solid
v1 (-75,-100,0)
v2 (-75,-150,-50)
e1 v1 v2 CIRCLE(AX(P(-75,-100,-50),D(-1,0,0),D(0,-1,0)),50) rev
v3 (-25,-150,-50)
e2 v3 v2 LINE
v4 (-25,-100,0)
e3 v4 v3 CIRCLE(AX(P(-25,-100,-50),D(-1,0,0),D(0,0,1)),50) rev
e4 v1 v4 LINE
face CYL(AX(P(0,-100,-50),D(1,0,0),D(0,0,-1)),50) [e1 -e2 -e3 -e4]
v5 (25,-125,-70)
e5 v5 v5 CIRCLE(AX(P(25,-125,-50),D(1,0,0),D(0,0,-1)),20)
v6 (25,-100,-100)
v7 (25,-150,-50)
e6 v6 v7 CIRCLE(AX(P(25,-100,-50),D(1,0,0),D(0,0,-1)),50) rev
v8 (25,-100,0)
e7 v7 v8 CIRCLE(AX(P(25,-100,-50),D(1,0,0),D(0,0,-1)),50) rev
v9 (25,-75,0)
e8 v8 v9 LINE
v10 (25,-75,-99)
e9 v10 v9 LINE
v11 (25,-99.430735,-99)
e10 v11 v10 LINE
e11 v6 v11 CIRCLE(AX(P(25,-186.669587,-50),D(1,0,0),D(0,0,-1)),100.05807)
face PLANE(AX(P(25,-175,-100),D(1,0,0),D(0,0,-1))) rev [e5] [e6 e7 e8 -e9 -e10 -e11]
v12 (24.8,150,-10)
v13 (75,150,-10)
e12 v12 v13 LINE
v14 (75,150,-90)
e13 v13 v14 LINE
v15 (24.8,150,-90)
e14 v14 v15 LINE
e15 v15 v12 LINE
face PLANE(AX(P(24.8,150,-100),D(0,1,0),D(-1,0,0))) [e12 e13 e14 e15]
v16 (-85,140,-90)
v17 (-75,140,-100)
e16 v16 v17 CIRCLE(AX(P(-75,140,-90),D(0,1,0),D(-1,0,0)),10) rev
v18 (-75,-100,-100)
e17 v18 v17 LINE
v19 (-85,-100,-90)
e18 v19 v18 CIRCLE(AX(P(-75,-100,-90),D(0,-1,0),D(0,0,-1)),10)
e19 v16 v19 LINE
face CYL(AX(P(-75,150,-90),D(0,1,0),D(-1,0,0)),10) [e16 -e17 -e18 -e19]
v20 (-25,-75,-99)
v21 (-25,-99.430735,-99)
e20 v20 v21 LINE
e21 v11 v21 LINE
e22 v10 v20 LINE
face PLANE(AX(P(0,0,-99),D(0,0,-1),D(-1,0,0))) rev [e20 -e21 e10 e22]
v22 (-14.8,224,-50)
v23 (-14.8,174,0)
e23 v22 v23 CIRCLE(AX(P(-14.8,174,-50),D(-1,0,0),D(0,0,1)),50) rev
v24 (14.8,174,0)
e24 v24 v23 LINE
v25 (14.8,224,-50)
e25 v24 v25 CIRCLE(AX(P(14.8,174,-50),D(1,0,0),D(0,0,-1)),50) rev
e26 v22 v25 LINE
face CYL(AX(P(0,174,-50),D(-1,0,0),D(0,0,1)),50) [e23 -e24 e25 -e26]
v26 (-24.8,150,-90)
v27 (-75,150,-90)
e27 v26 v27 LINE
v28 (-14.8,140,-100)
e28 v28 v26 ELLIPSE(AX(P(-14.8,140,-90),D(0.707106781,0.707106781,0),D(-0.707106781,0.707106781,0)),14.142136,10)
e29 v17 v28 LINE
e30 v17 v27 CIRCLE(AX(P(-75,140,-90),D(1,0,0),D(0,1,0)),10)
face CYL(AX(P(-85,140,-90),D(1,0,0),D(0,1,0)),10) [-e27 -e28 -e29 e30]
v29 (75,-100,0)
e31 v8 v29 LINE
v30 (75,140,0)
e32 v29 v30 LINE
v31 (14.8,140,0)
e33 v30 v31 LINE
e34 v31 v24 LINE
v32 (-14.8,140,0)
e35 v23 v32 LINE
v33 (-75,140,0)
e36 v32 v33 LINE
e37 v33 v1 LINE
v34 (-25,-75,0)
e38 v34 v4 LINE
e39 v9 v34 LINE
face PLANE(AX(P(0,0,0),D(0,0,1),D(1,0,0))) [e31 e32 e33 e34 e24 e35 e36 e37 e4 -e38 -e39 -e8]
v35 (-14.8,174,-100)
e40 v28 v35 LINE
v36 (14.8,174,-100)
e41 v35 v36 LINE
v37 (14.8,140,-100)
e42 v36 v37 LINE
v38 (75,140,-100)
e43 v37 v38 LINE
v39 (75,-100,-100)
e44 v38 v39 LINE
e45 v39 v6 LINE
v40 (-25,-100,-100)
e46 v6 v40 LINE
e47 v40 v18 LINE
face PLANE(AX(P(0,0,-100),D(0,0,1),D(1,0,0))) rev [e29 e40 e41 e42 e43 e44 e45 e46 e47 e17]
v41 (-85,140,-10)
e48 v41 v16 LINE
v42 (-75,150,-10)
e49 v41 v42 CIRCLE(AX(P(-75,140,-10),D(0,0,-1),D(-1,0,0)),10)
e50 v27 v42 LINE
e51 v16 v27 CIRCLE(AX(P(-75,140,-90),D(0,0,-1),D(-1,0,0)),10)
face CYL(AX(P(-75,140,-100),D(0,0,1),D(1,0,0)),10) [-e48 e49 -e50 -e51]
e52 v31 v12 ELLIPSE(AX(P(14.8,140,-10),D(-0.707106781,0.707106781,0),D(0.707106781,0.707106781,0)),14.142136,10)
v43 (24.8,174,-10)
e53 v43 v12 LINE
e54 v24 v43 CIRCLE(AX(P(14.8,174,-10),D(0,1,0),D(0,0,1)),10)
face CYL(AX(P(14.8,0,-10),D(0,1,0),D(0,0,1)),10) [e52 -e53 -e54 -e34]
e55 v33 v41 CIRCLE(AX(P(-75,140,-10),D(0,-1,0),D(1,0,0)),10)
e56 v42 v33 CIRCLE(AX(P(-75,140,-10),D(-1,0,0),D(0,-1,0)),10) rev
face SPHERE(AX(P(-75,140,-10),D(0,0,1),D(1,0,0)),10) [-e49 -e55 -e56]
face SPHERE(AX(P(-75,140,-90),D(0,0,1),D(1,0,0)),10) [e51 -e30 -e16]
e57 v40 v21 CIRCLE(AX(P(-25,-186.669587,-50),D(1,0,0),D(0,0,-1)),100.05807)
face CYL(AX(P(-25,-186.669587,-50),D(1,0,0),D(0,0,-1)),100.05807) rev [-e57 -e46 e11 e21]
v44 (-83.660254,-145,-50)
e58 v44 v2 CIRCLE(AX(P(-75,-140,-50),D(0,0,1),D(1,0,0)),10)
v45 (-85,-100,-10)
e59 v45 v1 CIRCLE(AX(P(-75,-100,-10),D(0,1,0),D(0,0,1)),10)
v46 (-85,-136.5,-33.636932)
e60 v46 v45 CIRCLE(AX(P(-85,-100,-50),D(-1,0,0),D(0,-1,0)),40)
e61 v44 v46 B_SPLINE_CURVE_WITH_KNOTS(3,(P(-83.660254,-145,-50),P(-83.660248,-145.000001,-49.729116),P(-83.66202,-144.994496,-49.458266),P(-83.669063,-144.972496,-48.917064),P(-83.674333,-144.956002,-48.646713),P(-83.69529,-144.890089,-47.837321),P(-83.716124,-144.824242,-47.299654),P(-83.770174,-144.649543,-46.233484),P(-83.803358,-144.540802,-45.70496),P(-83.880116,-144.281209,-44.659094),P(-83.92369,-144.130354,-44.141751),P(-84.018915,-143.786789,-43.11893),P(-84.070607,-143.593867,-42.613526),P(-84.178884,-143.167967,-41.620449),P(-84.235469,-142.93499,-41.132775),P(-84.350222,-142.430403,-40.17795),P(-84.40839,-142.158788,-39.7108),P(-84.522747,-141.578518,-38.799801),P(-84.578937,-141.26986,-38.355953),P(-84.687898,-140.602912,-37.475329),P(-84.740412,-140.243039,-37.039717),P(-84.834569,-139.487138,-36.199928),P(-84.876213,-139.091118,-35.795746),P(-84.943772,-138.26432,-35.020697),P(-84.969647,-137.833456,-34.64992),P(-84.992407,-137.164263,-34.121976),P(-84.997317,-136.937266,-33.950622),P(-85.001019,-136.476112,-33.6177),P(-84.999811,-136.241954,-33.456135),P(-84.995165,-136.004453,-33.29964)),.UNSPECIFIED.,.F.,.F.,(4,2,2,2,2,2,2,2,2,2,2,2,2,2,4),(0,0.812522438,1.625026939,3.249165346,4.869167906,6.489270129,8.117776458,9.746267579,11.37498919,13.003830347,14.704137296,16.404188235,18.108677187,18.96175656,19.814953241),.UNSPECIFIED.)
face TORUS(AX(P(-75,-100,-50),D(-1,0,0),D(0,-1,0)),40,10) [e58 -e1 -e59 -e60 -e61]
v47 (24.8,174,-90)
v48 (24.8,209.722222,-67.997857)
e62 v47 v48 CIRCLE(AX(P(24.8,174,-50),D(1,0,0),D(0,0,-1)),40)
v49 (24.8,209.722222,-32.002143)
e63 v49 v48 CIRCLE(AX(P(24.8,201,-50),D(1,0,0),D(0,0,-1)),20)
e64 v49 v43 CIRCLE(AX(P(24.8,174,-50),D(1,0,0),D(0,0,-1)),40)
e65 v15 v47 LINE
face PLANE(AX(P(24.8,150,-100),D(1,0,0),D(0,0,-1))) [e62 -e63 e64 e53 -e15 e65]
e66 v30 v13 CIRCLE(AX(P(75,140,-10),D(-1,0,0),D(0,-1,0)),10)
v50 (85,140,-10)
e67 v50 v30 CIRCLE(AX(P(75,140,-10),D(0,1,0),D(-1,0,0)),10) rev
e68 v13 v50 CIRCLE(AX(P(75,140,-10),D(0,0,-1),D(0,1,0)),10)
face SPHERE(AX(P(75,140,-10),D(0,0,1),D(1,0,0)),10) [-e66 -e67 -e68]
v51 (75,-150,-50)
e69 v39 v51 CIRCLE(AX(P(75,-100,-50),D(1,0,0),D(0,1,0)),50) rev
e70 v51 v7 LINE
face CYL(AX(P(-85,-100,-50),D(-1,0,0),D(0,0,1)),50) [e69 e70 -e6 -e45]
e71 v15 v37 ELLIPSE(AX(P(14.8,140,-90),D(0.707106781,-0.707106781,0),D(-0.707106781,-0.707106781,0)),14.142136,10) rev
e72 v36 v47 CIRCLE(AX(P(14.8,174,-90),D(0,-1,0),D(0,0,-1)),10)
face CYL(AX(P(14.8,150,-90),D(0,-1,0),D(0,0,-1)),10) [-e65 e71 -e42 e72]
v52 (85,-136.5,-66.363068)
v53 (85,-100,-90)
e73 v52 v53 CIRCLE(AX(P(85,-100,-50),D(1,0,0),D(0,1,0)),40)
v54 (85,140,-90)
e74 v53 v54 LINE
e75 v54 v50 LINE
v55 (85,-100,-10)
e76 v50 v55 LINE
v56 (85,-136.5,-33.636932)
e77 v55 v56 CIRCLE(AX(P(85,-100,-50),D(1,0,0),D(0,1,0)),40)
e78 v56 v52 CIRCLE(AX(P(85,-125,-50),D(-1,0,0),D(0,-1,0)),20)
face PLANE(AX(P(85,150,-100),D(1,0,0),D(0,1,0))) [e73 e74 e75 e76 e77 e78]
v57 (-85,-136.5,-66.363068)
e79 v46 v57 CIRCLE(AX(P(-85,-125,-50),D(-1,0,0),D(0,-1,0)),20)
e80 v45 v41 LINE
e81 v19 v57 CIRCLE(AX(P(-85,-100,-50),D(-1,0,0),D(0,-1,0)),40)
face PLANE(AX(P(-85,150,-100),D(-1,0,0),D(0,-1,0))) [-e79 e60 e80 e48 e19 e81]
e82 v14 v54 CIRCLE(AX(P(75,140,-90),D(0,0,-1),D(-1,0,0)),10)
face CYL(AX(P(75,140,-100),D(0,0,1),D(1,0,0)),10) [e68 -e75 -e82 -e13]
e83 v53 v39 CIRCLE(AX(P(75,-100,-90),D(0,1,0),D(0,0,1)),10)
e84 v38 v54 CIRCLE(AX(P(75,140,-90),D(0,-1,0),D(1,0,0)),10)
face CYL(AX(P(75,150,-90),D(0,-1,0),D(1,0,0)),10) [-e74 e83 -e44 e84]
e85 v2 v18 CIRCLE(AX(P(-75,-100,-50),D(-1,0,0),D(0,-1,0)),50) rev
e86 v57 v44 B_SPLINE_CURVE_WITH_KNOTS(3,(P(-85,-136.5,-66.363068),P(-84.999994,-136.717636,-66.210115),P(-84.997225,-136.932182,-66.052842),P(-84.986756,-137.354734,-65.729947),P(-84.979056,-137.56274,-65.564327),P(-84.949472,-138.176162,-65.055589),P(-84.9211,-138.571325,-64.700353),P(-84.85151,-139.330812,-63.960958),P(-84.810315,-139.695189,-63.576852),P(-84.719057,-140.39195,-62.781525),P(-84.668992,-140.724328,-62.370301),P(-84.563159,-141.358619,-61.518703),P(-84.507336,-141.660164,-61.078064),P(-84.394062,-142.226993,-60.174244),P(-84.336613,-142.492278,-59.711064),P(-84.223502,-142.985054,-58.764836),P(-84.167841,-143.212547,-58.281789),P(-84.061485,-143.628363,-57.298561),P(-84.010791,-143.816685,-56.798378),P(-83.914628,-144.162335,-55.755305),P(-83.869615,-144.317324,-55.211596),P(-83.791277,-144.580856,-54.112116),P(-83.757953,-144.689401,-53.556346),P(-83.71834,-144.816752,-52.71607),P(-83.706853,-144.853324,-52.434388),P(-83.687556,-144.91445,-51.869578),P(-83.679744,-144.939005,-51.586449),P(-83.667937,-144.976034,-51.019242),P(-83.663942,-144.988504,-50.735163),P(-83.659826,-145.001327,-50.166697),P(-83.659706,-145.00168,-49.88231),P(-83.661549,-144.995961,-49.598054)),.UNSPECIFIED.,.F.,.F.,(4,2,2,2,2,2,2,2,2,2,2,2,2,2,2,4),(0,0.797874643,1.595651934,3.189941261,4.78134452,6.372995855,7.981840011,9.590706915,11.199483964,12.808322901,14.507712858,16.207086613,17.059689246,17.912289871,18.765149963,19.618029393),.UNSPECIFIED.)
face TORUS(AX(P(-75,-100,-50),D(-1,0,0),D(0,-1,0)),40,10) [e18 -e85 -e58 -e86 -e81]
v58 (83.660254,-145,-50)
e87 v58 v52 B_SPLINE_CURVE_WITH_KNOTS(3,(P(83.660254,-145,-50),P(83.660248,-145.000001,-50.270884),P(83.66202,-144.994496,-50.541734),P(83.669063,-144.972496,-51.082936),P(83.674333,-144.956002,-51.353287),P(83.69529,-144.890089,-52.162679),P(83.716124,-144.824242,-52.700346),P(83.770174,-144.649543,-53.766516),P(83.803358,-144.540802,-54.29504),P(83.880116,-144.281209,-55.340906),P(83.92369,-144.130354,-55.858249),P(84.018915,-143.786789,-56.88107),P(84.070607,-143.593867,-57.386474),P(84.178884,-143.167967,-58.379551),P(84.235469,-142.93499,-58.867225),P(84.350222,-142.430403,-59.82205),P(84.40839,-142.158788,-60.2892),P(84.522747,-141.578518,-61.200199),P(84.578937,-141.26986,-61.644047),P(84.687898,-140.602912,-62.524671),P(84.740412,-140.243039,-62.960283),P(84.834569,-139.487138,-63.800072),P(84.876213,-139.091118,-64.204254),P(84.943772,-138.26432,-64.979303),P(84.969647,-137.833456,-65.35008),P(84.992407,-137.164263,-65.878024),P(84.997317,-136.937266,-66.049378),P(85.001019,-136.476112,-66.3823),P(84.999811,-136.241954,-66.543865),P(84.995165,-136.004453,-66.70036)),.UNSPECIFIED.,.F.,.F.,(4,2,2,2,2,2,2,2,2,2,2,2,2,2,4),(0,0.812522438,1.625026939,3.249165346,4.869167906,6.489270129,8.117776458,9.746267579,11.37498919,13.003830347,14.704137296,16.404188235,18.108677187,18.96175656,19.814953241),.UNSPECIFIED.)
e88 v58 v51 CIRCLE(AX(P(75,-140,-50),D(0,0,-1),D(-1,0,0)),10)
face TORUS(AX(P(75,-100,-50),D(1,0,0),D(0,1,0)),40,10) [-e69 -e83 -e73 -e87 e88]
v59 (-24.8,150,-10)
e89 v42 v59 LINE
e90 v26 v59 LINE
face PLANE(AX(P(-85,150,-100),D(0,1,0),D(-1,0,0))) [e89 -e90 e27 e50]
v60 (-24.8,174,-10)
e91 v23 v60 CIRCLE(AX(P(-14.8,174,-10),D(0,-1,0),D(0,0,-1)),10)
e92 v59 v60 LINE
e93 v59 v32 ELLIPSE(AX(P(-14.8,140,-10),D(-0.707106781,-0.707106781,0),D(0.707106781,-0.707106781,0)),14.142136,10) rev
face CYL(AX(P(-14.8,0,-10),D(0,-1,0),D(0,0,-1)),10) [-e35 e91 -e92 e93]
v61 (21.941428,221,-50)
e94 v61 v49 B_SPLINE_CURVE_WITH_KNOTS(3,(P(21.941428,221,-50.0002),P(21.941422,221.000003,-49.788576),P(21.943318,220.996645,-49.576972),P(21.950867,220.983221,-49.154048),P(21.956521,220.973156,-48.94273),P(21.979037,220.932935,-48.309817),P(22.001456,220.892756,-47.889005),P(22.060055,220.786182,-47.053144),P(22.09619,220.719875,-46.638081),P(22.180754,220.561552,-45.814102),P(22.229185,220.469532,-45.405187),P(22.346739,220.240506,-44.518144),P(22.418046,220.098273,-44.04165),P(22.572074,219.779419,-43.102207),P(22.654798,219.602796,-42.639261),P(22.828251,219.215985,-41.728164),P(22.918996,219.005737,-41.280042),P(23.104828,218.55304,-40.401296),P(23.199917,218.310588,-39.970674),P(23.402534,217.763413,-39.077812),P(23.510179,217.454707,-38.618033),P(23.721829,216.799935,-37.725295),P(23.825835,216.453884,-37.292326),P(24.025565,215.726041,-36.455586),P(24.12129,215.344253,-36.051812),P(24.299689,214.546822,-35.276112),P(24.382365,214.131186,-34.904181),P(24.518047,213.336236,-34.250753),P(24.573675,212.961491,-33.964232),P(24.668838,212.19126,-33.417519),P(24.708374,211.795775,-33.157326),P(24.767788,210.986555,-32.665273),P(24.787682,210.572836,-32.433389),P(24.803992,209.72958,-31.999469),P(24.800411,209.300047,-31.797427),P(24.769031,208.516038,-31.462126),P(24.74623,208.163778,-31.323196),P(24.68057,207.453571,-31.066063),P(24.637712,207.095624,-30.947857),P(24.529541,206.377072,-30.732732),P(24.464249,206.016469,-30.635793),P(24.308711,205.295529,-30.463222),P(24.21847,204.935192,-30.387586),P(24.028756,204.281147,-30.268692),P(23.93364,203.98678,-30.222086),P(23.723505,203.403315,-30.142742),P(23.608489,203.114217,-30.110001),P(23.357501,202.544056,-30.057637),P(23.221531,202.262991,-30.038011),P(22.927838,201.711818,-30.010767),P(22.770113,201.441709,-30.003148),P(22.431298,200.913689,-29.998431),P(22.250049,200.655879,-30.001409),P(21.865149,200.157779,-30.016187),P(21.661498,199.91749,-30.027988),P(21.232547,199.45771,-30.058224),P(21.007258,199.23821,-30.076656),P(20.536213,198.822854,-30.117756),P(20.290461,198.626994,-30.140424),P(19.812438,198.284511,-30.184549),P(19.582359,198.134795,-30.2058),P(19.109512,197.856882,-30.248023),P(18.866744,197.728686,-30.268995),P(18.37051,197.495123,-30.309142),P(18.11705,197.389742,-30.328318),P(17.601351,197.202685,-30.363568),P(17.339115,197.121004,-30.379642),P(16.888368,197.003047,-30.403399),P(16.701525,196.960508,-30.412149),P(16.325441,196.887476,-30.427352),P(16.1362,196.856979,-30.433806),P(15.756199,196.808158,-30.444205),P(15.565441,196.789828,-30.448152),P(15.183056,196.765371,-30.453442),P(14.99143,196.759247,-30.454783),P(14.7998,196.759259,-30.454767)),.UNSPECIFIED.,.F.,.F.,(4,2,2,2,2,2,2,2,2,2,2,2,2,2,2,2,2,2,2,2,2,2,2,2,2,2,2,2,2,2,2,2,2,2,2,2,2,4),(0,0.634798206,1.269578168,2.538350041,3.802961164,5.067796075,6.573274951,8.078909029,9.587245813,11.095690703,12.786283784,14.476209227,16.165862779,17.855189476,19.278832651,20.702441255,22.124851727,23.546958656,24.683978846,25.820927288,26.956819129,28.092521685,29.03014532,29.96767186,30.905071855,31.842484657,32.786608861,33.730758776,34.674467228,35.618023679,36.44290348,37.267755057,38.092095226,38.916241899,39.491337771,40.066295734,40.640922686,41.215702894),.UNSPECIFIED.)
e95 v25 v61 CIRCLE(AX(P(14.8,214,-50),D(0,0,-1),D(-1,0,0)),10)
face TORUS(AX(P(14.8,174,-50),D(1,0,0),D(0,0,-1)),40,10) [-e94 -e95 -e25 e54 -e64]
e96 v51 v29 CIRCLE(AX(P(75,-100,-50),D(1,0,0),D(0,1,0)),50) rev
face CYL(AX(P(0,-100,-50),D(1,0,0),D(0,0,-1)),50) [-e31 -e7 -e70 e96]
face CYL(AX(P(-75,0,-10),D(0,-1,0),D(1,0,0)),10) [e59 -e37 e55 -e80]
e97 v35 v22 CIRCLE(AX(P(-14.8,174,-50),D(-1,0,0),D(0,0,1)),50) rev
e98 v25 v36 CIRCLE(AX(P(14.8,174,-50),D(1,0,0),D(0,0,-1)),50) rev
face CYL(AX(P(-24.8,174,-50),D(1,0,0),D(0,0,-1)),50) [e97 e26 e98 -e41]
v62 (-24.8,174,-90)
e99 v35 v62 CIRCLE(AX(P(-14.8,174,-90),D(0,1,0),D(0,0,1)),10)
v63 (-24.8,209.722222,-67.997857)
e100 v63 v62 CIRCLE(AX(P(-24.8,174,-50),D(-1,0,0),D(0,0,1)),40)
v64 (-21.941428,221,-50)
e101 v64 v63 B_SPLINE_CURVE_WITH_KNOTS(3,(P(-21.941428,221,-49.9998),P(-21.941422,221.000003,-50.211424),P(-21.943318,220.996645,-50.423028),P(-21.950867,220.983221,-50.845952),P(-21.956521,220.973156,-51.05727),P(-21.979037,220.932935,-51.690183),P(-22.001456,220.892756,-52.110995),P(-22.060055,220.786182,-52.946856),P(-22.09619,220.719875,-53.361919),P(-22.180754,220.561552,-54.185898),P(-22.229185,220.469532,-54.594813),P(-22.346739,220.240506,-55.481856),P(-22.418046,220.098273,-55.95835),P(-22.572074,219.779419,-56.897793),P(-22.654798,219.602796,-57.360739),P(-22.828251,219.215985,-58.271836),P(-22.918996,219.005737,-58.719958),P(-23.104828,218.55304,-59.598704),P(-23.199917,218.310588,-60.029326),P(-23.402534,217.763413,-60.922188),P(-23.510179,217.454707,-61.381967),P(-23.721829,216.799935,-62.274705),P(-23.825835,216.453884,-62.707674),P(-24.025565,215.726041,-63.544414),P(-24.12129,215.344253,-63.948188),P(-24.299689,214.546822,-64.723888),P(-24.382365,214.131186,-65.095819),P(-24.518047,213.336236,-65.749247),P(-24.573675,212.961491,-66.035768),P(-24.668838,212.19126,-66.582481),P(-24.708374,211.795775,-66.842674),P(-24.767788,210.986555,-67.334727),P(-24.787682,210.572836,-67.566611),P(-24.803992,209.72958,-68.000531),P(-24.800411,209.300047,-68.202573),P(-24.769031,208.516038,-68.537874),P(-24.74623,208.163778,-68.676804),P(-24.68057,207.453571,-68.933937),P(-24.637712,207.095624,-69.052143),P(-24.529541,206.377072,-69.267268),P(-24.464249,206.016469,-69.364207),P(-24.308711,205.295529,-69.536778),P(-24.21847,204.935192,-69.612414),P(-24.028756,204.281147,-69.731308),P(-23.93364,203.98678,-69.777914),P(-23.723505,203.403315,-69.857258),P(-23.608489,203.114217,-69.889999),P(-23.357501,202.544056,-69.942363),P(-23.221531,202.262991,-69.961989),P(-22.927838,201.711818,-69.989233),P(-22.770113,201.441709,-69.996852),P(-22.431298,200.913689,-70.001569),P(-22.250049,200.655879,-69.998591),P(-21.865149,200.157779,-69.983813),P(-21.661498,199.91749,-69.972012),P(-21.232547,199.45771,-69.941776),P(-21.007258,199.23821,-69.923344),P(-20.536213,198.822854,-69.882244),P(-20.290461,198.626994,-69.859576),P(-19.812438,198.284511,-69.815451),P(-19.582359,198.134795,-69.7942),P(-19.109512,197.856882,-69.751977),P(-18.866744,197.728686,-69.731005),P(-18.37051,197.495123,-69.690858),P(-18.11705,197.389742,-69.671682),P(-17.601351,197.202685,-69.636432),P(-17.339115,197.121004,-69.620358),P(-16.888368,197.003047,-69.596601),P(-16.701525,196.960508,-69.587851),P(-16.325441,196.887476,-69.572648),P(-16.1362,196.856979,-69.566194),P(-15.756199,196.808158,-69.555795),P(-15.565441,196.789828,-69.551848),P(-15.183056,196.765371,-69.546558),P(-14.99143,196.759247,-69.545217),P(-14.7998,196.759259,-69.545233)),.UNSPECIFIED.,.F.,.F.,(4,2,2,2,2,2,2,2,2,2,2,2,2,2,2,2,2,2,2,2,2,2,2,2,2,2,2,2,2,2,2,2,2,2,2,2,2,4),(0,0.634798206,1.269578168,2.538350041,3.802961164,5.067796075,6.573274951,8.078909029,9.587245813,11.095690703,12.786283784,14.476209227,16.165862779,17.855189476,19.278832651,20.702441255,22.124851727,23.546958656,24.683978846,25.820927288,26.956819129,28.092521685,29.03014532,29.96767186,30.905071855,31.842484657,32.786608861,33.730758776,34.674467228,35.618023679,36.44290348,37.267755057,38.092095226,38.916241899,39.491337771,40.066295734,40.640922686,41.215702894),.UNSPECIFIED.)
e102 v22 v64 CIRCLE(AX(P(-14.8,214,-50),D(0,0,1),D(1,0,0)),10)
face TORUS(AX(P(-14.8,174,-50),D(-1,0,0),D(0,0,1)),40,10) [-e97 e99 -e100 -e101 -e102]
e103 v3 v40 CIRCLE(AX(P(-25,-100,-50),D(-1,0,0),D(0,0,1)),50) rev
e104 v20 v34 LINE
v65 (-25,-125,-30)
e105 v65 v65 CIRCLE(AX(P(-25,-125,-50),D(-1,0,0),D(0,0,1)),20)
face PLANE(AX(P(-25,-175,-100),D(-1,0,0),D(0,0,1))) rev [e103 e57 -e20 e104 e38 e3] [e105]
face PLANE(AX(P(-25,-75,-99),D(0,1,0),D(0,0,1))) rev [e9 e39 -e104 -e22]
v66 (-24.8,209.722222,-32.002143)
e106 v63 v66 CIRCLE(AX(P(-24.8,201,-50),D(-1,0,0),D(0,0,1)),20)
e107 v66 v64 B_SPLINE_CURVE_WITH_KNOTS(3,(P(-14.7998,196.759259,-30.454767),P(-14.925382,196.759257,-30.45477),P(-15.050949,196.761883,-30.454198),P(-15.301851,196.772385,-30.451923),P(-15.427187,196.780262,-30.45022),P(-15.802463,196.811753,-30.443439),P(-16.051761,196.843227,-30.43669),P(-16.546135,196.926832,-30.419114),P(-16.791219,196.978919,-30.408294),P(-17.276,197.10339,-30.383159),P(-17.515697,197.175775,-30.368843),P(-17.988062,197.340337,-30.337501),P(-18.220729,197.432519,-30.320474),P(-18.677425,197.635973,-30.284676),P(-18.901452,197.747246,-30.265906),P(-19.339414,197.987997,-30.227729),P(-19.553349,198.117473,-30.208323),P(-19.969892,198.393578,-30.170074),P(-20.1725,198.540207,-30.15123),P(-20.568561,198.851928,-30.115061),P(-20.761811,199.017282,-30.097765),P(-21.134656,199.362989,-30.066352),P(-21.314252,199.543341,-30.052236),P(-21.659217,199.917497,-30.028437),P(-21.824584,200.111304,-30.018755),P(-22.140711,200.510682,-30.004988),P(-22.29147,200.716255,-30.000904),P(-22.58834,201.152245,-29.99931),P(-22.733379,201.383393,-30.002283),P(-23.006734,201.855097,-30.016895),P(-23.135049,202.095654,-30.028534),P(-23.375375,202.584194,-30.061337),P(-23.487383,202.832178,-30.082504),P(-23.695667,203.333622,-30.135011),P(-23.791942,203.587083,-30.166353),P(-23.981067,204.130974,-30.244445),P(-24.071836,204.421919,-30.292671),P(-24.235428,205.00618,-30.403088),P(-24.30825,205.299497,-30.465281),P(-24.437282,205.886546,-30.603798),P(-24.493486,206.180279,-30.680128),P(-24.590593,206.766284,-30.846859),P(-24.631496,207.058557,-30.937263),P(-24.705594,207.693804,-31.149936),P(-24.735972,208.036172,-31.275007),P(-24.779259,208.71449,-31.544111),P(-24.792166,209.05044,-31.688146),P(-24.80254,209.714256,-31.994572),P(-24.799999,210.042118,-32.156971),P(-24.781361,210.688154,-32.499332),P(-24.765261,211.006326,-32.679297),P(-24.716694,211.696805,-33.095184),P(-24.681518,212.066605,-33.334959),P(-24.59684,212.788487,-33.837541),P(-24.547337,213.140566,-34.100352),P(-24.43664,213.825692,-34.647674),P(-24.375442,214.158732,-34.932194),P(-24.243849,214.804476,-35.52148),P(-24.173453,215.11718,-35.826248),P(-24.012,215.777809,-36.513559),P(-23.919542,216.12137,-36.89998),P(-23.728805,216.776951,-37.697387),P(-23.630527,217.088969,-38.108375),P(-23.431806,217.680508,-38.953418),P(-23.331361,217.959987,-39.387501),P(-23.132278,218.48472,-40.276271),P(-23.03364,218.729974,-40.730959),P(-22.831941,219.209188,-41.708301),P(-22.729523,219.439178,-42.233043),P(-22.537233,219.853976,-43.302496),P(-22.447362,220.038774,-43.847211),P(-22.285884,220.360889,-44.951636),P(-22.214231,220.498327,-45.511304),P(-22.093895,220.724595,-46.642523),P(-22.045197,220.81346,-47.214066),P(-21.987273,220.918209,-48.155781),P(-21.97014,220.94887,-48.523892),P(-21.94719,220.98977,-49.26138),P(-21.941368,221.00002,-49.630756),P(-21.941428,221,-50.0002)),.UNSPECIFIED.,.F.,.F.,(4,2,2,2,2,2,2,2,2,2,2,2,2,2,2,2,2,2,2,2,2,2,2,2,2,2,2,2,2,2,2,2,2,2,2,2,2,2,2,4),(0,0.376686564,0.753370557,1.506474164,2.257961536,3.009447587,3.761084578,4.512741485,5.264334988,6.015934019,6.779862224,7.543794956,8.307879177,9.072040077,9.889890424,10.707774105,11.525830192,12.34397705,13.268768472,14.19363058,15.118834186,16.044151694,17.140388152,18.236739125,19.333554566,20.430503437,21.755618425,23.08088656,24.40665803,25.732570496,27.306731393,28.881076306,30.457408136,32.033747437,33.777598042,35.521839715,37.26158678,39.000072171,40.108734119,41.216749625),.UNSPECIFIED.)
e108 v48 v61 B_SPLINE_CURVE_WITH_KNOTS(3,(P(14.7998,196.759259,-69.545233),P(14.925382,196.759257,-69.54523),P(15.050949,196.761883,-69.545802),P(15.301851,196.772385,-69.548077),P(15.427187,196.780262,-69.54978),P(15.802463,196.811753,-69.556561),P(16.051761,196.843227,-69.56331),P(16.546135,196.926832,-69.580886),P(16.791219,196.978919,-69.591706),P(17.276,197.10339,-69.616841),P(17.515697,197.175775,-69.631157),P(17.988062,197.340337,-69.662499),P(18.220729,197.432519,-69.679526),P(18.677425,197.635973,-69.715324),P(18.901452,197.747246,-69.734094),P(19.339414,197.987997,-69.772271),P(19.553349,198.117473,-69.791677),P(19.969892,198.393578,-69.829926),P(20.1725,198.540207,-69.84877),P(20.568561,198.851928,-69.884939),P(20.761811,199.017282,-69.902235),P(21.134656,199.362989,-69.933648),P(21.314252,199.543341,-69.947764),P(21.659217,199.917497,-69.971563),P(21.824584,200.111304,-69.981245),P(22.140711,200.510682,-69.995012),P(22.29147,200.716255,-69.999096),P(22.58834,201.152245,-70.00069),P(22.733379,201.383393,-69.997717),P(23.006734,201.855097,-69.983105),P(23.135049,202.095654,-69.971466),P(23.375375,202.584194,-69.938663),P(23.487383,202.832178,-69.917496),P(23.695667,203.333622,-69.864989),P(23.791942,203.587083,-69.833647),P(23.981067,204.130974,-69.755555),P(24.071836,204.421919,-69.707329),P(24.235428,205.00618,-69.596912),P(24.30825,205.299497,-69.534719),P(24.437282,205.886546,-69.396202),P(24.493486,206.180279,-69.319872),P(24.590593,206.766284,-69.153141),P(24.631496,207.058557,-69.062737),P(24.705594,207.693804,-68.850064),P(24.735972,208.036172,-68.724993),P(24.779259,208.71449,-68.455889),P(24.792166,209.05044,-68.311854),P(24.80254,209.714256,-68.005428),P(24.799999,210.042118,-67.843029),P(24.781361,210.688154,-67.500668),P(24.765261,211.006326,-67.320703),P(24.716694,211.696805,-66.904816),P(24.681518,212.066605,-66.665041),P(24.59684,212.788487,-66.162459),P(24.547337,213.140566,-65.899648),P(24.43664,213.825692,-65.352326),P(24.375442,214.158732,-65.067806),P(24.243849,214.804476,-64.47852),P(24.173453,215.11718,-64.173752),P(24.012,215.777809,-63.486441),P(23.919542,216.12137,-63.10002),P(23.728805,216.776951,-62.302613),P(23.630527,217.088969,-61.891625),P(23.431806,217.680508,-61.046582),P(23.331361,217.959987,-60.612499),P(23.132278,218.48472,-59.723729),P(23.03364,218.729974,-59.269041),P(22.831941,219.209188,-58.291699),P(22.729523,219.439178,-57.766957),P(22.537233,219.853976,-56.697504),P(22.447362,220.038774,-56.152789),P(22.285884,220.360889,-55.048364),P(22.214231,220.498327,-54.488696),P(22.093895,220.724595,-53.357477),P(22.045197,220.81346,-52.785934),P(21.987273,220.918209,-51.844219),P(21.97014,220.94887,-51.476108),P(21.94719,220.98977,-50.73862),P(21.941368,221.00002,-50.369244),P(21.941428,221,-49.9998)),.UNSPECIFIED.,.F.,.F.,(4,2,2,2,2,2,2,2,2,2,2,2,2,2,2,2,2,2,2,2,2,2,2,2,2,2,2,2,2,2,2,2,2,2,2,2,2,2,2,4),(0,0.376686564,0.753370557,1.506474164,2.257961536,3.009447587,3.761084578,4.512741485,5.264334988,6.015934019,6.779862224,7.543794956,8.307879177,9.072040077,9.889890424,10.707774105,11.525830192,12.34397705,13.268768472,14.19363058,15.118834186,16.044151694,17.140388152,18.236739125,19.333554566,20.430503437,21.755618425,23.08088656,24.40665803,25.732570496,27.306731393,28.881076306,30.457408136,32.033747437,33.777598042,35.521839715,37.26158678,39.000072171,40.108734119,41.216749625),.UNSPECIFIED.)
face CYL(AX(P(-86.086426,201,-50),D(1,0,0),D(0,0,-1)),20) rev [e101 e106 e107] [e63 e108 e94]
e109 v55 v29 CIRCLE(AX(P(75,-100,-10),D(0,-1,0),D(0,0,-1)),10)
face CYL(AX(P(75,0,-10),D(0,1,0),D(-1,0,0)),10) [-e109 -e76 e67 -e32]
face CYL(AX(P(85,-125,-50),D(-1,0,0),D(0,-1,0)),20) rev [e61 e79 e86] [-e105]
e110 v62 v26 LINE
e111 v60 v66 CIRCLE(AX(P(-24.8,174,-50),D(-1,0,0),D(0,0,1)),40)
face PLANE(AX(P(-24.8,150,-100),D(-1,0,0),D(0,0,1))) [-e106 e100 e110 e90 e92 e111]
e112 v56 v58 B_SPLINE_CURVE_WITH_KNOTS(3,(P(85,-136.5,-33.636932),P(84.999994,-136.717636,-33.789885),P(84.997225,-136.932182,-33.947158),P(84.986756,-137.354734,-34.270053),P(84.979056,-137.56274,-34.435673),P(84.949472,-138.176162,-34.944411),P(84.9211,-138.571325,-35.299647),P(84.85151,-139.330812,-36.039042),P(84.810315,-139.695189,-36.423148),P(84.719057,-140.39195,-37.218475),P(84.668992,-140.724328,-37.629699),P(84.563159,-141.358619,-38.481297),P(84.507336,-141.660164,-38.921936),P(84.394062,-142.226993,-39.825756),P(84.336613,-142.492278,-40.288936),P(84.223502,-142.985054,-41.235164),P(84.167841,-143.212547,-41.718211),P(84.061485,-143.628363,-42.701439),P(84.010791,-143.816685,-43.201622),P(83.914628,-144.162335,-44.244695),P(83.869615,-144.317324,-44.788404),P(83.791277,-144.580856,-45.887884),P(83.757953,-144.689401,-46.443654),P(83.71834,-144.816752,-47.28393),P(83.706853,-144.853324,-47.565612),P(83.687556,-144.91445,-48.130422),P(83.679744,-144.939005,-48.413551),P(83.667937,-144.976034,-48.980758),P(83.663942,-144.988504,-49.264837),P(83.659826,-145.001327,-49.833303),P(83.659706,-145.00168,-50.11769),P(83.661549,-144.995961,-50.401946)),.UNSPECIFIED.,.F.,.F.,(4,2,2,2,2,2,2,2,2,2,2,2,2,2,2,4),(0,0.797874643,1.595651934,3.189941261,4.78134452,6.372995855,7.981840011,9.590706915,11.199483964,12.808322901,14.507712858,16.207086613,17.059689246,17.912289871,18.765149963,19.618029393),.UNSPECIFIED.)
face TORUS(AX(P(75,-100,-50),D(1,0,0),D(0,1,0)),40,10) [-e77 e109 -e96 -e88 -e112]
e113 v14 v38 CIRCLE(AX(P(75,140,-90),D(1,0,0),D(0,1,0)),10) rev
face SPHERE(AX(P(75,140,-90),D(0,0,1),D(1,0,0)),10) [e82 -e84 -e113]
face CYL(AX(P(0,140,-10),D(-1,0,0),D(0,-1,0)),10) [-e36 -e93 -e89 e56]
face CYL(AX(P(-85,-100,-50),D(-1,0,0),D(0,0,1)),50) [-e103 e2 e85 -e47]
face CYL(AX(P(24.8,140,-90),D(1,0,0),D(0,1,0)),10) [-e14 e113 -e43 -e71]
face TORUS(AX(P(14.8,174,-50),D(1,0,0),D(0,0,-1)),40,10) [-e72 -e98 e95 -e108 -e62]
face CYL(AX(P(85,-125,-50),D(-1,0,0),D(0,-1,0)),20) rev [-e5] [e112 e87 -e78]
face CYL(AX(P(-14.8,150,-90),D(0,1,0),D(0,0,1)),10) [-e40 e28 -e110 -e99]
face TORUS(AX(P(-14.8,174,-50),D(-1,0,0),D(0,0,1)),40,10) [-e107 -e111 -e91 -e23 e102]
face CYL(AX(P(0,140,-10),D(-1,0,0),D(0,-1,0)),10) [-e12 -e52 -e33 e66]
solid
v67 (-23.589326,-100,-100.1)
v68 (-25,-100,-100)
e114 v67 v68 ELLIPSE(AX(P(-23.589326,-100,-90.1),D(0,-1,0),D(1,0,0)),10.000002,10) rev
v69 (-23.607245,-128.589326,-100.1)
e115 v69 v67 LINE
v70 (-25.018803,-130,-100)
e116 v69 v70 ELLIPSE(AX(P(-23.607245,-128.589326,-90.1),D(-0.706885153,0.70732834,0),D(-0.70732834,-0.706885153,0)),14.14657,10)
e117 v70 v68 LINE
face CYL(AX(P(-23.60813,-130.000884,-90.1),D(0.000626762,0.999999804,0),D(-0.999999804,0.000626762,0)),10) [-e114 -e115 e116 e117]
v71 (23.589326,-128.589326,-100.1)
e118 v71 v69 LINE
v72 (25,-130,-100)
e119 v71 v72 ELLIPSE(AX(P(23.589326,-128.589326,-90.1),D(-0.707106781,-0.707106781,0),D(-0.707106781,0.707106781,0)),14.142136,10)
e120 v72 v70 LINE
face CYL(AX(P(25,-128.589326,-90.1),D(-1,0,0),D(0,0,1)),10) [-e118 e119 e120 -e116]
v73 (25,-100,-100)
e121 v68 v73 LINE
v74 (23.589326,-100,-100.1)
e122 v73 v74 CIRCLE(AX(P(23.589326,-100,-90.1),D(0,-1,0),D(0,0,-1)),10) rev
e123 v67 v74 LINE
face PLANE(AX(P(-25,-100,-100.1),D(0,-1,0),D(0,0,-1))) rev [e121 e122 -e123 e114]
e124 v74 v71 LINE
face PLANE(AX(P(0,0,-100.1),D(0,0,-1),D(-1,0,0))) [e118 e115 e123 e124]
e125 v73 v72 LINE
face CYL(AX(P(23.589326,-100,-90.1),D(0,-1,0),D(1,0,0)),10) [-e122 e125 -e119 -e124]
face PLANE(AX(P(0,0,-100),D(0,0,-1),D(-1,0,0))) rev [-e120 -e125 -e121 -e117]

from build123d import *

# Parameters (mm, degrees)
BOSS_EXTRUDE1_DEPTH    = 100
SKETCH2_W              = 50
SKETCH2_H              = 50
CUT_EXTRUDE1_DEPTH     = 260.617025636
FILLET1_R              = 50
CUT_EXTRUDE2_DEPTH     = 25
SKETCH7_R              = 20
CUT_EXTRUDE3_DEPTH     = 299.456026912
FILLET2_R              = 50
CUT_EXTRUDE6_START     = -150
CUT_EXTRUDE6_OUTLINE_W = 50
CUT_EXTRUDE6_OUTLINE_H = 6.698729811
CUT_EXTRUDE6_DEPTH     = 50
CUT_EXTRUDE7_DEPTH     = 25
FILLET3_R              = 10
SKETCH11_W             = 50
SKETCH11_H             = 25
CUT_EXTRUDE8_DEPTH     = 99
BOSS_EXTRUDE7_DEPTH    = 0.1
FILLET4_R              = 10
FILLET5_R              = 10
SKETCH14_R             = 20
CUT_EXTRUDE9_DEPTH     = 269.797414546


with BuildPart() as part:
    # Sketch1 → Boss-Extrude1 (new body)
    with BuildSketch(Plane.XY):
        Polygon((-24.8, 150), (-24.8, 224), (24.8, 224), (24.8, 150), (85, 150), (85, -150), (-85, -150), (-85, 150), align=None)
    extrude(amount=-BOSS_EXTRUDE1_DEPTH)

    # Sketch2 → Cut-Extrude1 (cut, through all)
    with BuildSketch(Plane.XY):
        with Locations((0, -150)):
            Rectangle(SKETCH2_W, SKETCH2_H)
    extrude(amount=-CUT_EXTRUDE1_DEPTH, mode=Mode.SUBTRACT)

    # Fillet1
    fillet1_edges = [part.edges().sort_by_distance(p)[0] for p in [
        (0, 224, -100),
        (0, 224, 0),
    ]]
    fillet(fillet1_edges, radius=FILLET1_R - 0.0001)  # a hair under: the kernel refuses the full size

    # Sketch6 → Cut-Extrude2 (cut, symmetric)
    with BuildSketch(Plane(origin=(0, 0, 0), x_dir=(0, 0, -1), z_dir=(1, 0, 0))):
        with BuildLine():
            Line((100, -125), (0, -125))
            ThreePointArc((0, -125), (50, -75), (100, -125))
        make_face()
    extrude(amount=CUT_EXTRUDE2_DEPTH, both=True, mode=Mode.SUBTRACT)

    # Sketch7 → Cut-Extrude3 (cut, through all)
    with BuildSketch(Plane.ZY.offset(85)):
        with Locations(Location((-50, -125, 0), (0, 0, 270))):
            Circle(SKETCH7_R)
    extrude(amount=-CUT_EXTRUDE3_DEPTH, mode=Mode.SUBTRACT)

    # Fillet2
    fillet2_edges = [part.edges().sort_by_distance(p)[0] for p in [
        (-55, -150, -100),
        (-55, -150, 0),
    ]]
    fillet(fillet2_edges, radius=FILLET2_R - 0.0001)  # a hair under: the kernel refuses the full size

    # Cut-Extrude6: read off the stored shape, not the designer's step
    # Cut-Extrude6 outline → Cut-Extrude6 (cut)
    with BuildSketch(Plane(origin=(0, 0, 0), x_dir=(1, 0, 0), z_dir=(0, 1, 0)).offset(CUT_EXTRUDE6_START)):
        with Locations((0, 96.650635095)):
            Rectangle(CUT_EXTRUDE6_OUTLINE_W, CUT_EXTRUDE6_OUTLINE_H)
        with Locations((0, 3.349364906)):
            Rectangle(CUT_EXTRUDE6_OUTLINE_W, CUT_EXTRUDE6_OUTLINE_H)
    extrude(amount=CUT_EXTRUDE6_DEPTH, mode=Mode.SUBTRACT)

    # Sketch10 → Cut-Extrude7 (cut, symmetric)
    with BuildSketch(Plane(origin=(0, 0, 0), x_dir=(0, 0, -1), z_dir=(1, 0, 0))):
        with BuildLine():
            Line((0, -100), (100, -100))
            ThreePointArc((100, -100), (50, -86.611517322), (0, -100))
        make_face()
    extrude(amount=CUT_EXTRUDE7_DEPTH, both=True, mode=Mode.SUBTRACT)

    # Fillet3
    # the kernel refuses this fillet: 10 mm, written as the material it takes off along each edge
    with BuildSketch(Plane(origin=(24.8, 174.0001, -100), x_dir=(0, 0, 1), z_dir=(0, -1, 0)), Plane(origin=(-24.8, 150, 0), x_dir=(1, 0, 0), z_dir=(0, 1, 0)), Plane(origin=(-24.8, 150, -100), x_dir=(0, 0, 1), z_dir=(0, 1, 0)), Plane(origin=(24.8, 174.0001, 0), x_dir=(-1, 0, 0), z_dir=(0, -1, 0))) as fillet3_piece_1:
        with BuildLine():
            CenterArc((FILLET3_R, FILLET3_R), FILLET3_R, 180, 90)
            Line((0, FILLET3_R), (0, 0))
            Line((0, 0), (FILLET3_R, 0))
        make_face()
    extrude(amount=24.0001, mode=Mode.SUBTRACT)
    with BuildSketch(Plane(origin=(24.8, 150, 0), x_dir=(0, -1, 0), z_dir=(1, 0, 0)), Plane(origin=(-110, 150, -100), x_dir=(0, 0, 1), z_dir=(1, 0, 0)), Plane(origin=(24.8, 150, -100), x_dir=(0, 0, 1), z_dir=(1, 0, 0)), Plane(origin=(-110, 150, 0), x_dir=(0, -1, 0), z_dir=(1, 0, 0))) as fillet3_piece_2:
        with BuildLine():
            CenterArc((FILLET3_R, FILLET3_R), FILLET3_R, 180, 90)
            Line((0, FILLET3_R), (0, 0))
            Line((0, 0), (FILLET3_R, 0))
        make_face()
    extrude(amount=85.2, mode=Mode.SUBTRACT)
    with BuildSketch(Plane(origin=(-85, -100.0001, -100), x_dir=(0, 0, 1), z_dir=(0, 1, 0)), Plane(origin=(85, 175, 0), x_dir=(-1, 0, 0), z_dir=(0, -1, 0)), Plane(origin=(85, 175, -100), x_dir=(0, 0, 1), z_dir=(0, -1, 0)), Plane(origin=(-85, -100.0001, 0), x_dir=(1, 0, 0), z_dir=(0, 1, 0))) as fillet3_piece_3:
        with BuildLine():
            CenterArc((FILLET3_R, FILLET3_R), FILLET3_R, 180, 90)
            Line((0, FILLET3_R), (0, 0))
            Line((0, 0), (FILLET3_R, 0))
        make_face()
    extrude(amount=275.0001, mode=Mode.SUBTRACT)
    with BuildSketch(Plane(origin=(-24.8, 174.0001, -49.9999), x_dir=(0, 1, 0), z_dir=(0, 0, -1))) as fillet3_piece_4:
        with BuildLine():
            CenterArc((49.9999 - FILLET3_R, FILLET3_R), FILLET3_R, 270, 90)
            Line((49.9999 - FILLET3_R, 0), (49.9999, 0))
            Line((49.9999, 0), (49.9999, FILLET3_R))
        make_face()
    revolve(axis=Axis((-24.8, 174.0001, -49.9999), (1, 0, 0)), revolution_arc=90, mode=Mode.SUBTRACT)
    with BuildSketch(Plane(origin=(-24.8, 174.0001, -50.0001), x_dir=(0, 1, 0), z_dir=(0, 0, 1))) as fillet3_piece_5:
        with BuildLine():
            CenterArc((49.9999 - FILLET3_R, -FILLET3_R), FILLET3_R, 0, 90)
            Line((49.9999, -FILLET3_R), (49.9999, 0))
            Line((49.9999, 0), (49.9999 - FILLET3_R, 0))
        make_face()
    revolve(axis=Axis((-24.8, 174.0001, -50.0001), (-1, 0, 0)), revolution_arc=90, mode=Mode.SUBTRACT)
    with BuildSketch(Plane(origin=(24.8, 174.0001, -49.9999), x_dir=(0, 1, 0), z_dir=(0, 0, -1))) as fillet3_piece_6:
        with BuildLine():
            CenterArc((49.9999 - FILLET3_R, -FILLET3_R), FILLET3_R, 0, 90)
            Line((49.9999, -FILLET3_R), (49.9999, 0))
            Line((49.9999, 0), (49.9999 - FILLET3_R, 0))
        make_face()
    revolve(axis=Axis((24.8, 174.0001, -49.9999), (1, 0, 0)), revolution_arc=90, mode=Mode.SUBTRACT)
    with BuildSketch(Plane(origin=(24.8, 174.0001, -50.0001), x_dir=(0, 1, 0), z_dir=(0, 0, 1))) as fillet3_piece_7:
        with BuildLine():
            CenterArc((49.9999 - FILLET3_R, FILLET3_R), FILLET3_R, 270, 90)
            Line((49.9999, FILLET3_R), (49.9999, 0))
            Line((49.9999, 0), (49.9999 - FILLET3_R, 0))
        make_face()
    revolve(axis=Axis((24.8, 174.0001, -50.0001), (-1, 0, 0)), revolution_arc=90, mode=Mode.SUBTRACT)
    with BuildSketch(Plane(origin=(85, -100.0001, -49.9999), x_dir=(0, 0, 1), z_dir=(0, 1, 0))) as fillet3_piece_8:
        with BuildLine():
            CenterArc((49.9999 - FILLET3_R, -FILLET3_R), FILLET3_R, 360, 90)
            Line((49.9999, -FILLET3_R), (49.9999, 0))
            Line((49.9999, 0), (49.9999 - FILLET3_R, 0))
        make_face()
    revolve(axis=Axis((85, -100.0001, -49.9999), (1, 0, 0)), revolution_arc=90, mode=Mode.SUBTRACT)
    with BuildSketch(Plane(origin=(85, -100.0001, -50.0001), x_dir=(0, 0, -1), z_dir=(0, 1, 0))) as fillet3_piece_9:
        with BuildLine():
            CenterArc((49.9999 - FILLET3_R, FILLET3_R), FILLET3_R, 270, 90)
            Line((49.9999, FILLET3_R), (49.9999, 0))
            Line((49.9999, 0), (49.9999 - FILLET3_R, 0))
        make_face()
    revolve(axis=Axis((85, -100.0001, -50.0001), (-1, 0, 0)), revolution_arc=90, mode=Mode.SUBTRACT)
    with BuildSketch(Plane(origin=(-85, -100.0001, -49.9999), x_dir=(0, 0, 1), z_dir=(0, 1, 0))) as fillet3_piece_10:
        with BuildLine():
            CenterArc((49.9999 - FILLET3_R, FILLET3_R), FILLET3_R, 270, 90)
            Line((49.9999, FILLET3_R), (49.9999, 0))
            Line((49.9999, 0), (49.9999 - FILLET3_R, 0))
        make_face()
    revolve(axis=Axis((-85, -100.0001, -49.9999), (1, 0, 0)), revolution_arc=90, mode=Mode.SUBTRACT)
    with BuildSketch(Plane(origin=(-85, -100.0001, -50.0001), x_dir=(0, 0, -1), z_dir=(0, 1, 0))) as fillet3_piece_11:
        with BuildLine():
            CenterArc((49.9999 - FILLET3_R, -FILLET3_R), FILLET3_R, 0, 90)
            Line((49.9999, -FILLET3_R), (49.9999, 0))
            Line((49.9999, 0), (49.9999 - FILLET3_R, 0))
        make_face()
    revolve(axis=Axis((-85, -100.0001, -50.0001), (-1, 0, 0)), revolution_arc=90, mode=Mode.SUBTRACT)
    with BuildSketch(Plane(origin=(-85, -150, -49.9999), x_dir=(0, 1, 0), z_dir=(0, 0, -1)), Plane(origin=(24.8, 224, -49.9999), x_dir=(0, -1, 0), z_dir=(0, 0, -1))) as fillet3_piece_12:
        with BuildLine():
            CenterArc((FILLET3_R, FILLET3_R), FILLET3_R, 180, 90)
            Line((0, FILLET3_R), (0, 0))
            Line((0, 0), (FILLET3_R, 0))
        make_face()
    extrude(amount=0.0002, mode=Mode.SUBTRACT)
    with BuildSketch(Plane(origin=(85, -150, -49.9999), x_dir=(0, 1, 0), z_dir=(0, 0, -1)), Plane(origin=(-24.8, 224, -49.9999), x_dir=(0, -1, 0), z_dir=(0, 0, -1))) as fillet3_piece_13:
        with BuildLine():
            CenterArc((FILLET3_R, -FILLET3_R), FILLET3_R, 90, 90)
            Line((0, -FILLET3_R), (0, 0))
            Line((0, 0), (FILLET3_R, 0))
        make_face()
    extrude(amount=0.0002, mode=Mode.SUBTRACT)
    with BuildSketch(Plane(origin=(-0.2, 150, -100), x_dir=(0, 0, 1), z_dir=(1, 0, 0))) as fillet3_piece_14a_section:
        with BuildLine():
            CenterArc((FILLET3_R, FILLET3_R), FILLET3_R, 180, 90)
            Line((0, FILLET3_R), (0, 0))
            Line((0, 0), (FILLET3_R, 0))
        make_face()
    fillet3_piece_14a = extrude(amount=110.2, mode=Mode.PRIVATE)
    fillet3_piece_14a = split(fillet3_piece_14a, bisect_by=Plane(origin=(24.8, 150, -100), z_dir=(-1, 0, 0)), keep=Keep.TOP, mode=Mode.PRIVATE)
    with BuildSketch(Plane(origin=(24.8, 174.0001, -100), x_dir=(0, 0, 1), z_dir=(0, -1, 0))) as fillet3_piece_14b_section:
        with BuildLine():
            CenterArc((FILLET3_R, FILLET3_R), FILLET3_R, 180, 90)
            Line((0, FILLET3_R), (0, 0))
            Line((0, 0), (FILLET3_R, 0))
        make_face()
    fillet3_piece_14b = extrude(amount=49.0001, mode=Mode.PRIVATE)
    fillet3_piece_14b = split(fillet3_piece_14b, bisect_by=Plane(origin=(24.8, 150, -100), z_dir=(0, -1, 0)), keep=Keep.TOP, mode=Mode.PRIVATE)
    fillet3_piece_14 = fillet3_piece_14a & fillet3_piece_14b
    add(fillet3_piece_14, mode=Mode.SUBTRACT)
    with BuildSketch(Plane(origin=(-0.2, 150, 0), x_dir=(0, -1, 0), z_dir=(1, 0, 0))) as fillet3_piece_15a_section:
        with BuildLine():
            CenterArc((FILLET3_R, FILLET3_R), FILLET3_R, 180, 90)
            Line((0, FILLET3_R), (0, 0))
            Line((0, 0), (FILLET3_R, 0))
        make_face()
    fillet3_piece_15a = extrude(amount=110.2, mode=Mode.PRIVATE)
    fillet3_piece_15a = split(fillet3_piece_15a, bisect_by=Plane(origin=(24.8, 150, 0), z_dir=(-1, 0, 0)), keep=Keep.TOP, mode=Mode.PRIVATE)
    with BuildSketch(Plane(origin=(24.8, 174.0001, 0), x_dir=(-1, 0, 0), z_dir=(0, -1, 0))) as fillet3_piece_15b_section:
        with BuildLine():
            CenterArc((FILLET3_R, FILLET3_R), FILLET3_R, 180, 90)
            Line((0, FILLET3_R), (0, 0))
            Line((0, 0), (FILLET3_R, 0))
        make_face()
    fillet3_piece_15b = extrude(amount=49.0001, mode=Mode.PRIVATE)
    fillet3_piece_15b = split(fillet3_piece_15b, bisect_by=Plane(origin=(24.8, 150, 0), z_dir=(0, -1, 0)), keep=Keep.TOP, mode=Mode.PRIVATE)
    fillet3_piece_15 = fillet3_piece_15a & fillet3_piece_15b
    add(fillet3_piece_15, mode=Mode.SUBTRACT)
    with BuildSketch(Plane(origin=(-24.8, 125, -100), x_dir=(0, 0, 1), z_dir=(0, 1, 0))) as fillet3_piece_16a_section:
        with BuildLine():
            CenterArc((FILLET3_R, FILLET3_R), FILLET3_R, 180, 90)
            Line((0, FILLET3_R), (0, 0))
            Line((0, 0), (FILLET3_R, 0))
        make_face()
    fillet3_piece_16a = extrude(amount=49.0001, mode=Mode.PRIVATE)
    fillet3_piece_16a = split(fillet3_piece_16a, bisect_by=Plane(origin=(-24.8, 150, -100), z_dir=(0, -1, 0)), keep=Keep.TOP, mode=Mode.PRIVATE)
    with BuildSketch(Plane(origin=(-110, 150, -100), x_dir=(0, 0, 1), z_dir=(1, 0, 0))) as fillet3_piece_16b_section:
        with BuildLine():
            CenterArc((FILLET3_R, FILLET3_R), FILLET3_R, 180, 90)
            Line((0, FILLET3_R), (0, 0))
            Line((0, 0), (FILLET3_R, 0))
        make_face()
    fillet3_piece_16b = extrude(amount=110.2, mode=Mode.PRIVATE)
    fillet3_piece_16b = split(fillet3_piece_16b, bisect_by=Plane(origin=(-24.8, 150, -100), z_dir=(1, 0, 0)), keep=Keep.TOP, mode=Mode.PRIVATE)
    fillet3_piece_16 = fillet3_piece_16a & fillet3_piece_16b
    add(fillet3_piece_16, mode=Mode.SUBTRACT)
    with BuildSketch(Plane(origin=(-24.8, 125, 0), x_dir=(1, 0, 0), z_dir=(0, 1, 0))) as fillet3_piece_17a_section:
        with BuildLine():
            CenterArc((FILLET3_R, FILLET3_R), FILLET3_R, 180, 90)
            Line((0, FILLET3_R), (0, 0))
            Line((0, 0), (FILLET3_R, 0))
        make_face()
    fillet3_piece_17a = extrude(amount=49.0001, mode=Mode.PRIVATE)
    fillet3_piece_17a = split(fillet3_piece_17a, bisect_by=Plane(origin=(-24.8, 150, 0), z_dir=(0, -1, 0)), keep=Keep.TOP, mode=Mode.PRIVATE)
    with BuildSketch(Plane(origin=(-110, 150, 0), x_dir=(0, -1, 0), z_dir=(1, 0, 0))) as fillet3_piece_17b_section:
        with BuildLine():
            CenterArc((FILLET3_R, FILLET3_R), FILLET3_R, 180, 90)
            Line((0, FILLET3_R), (0, 0))
            Line((0, 0), (FILLET3_R, 0))
        make_face()
    fillet3_piece_17b = extrude(amount=110.2, mode=Mode.PRIVATE)
    fillet3_piece_17b = split(fillet3_piece_17b, bisect_by=Plane(origin=(-24.8, 150, 0), z_dir=(1, 0, 0)), keep=Keep.TOP, mode=Mode.PRIVATE)
    fillet3_piece_17 = fillet3_piece_17a & fillet3_piece_17b
    add(fillet3_piece_17, mode=Mode.SUBTRACT)

    # Sketch11 → Cut-Extrude8 (cut)
    with BuildSketch(Plane.XY):
        with Locations((0, -87.5)):
            Rectangle(SKETCH11_W, SKETCH11_H)
    extrude(amount=-CUT_EXTRUDE8_DEPTH, mode=Mode.SUBTRACT)

    # Fillet5
    # the kernel refuses this fillet: 10 mm, written as the material it takes off along each edge
    with BuildSketch(Plane(origin=(75, 140, -10), x_dir=(0, 1, 0), z_dir=(1, 0, 0))) as fillet5_piece_1_section:
        Polygon((0, 0), (FILLET5_R, 0), (FILLET5_R, FILLET5_R), (0, FILLET5_R), align=None)
    fillet5_piece_1 = extrude(amount=FILLET5_R, mode=Mode.PRIVATE)
    fillet5_piece_1 = fillet5_piece_1 - Plane(origin=(75, 140, -10), x_dir=(0, -0.7071067811865475, -0.7071067811865475), z_dir=(1, 0, 0)) * Sphere(FILLET5_R, mode=Mode.PRIVATE)
    add(fillet5_piece_1, mode=Mode.SUBTRACT)
    with BuildSketch(Plane(origin=(75, 140, -90), x_dir=(0, 1, 0), z_dir=(1, 0, 0))) as fillet5_piece_2_section:
        Polygon((0, 0), (FILLET5_R, 0), (FILLET5_R, -FILLET5_R), (0, -FILLET5_R), align=None)
    fillet5_piece_2 = extrude(amount=FILLET5_R, mode=Mode.PRIVATE)
    fillet5_piece_2 = fillet5_piece_2 - Plane(origin=(75, 140, -90), x_dir=(0, -0.7071067811865475, 0.7071067811865475), z_dir=(1, 0, 0)) * Sphere(FILLET5_R, mode=Mode.PRIVATE)
    add(fillet5_piece_2, mode=Mode.SUBTRACT)
    with BuildSketch(Plane(origin=(-75, 140, -90), x_dir=(0, 1, 0), z_dir=(-1, 0, 0))) as fillet5_piece_3_section:
        Polygon((0, 0), (FILLET5_R, 0), (FILLET5_R, FILLET5_R), (0, FILLET5_R), align=None)
    fillet5_piece_3 = extrude(amount=FILLET5_R, mode=Mode.PRIVATE)
    fillet5_piece_3 = fillet5_piece_3 - Plane(origin=(-75, 140, -90), x_dir=(0, -0.7071067811865475, 0.7071067811865475), z_dir=(-1, 0, 0)) * Sphere(FILLET5_R, mode=Mode.PRIVATE)
    add(fillet5_piece_3, mode=Mode.SUBTRACT)
    with BuildSketch(Plane(origin=(-75, 140, -10), x_dir=(0, 1, 0), z_dir=(-1, 0, 0))) as fillet5_piece_4_section:
        Polygon((0, 0), (FILLET5_R, 0), (FILLET5_R, -FILLET5_R), (0, -FILLET5_R), align=None)
    fillet5_piece_4 = extrude(amount=FILLET5_R, mode=Mode.PRIVATE)
    fillet5_piece_4 = fillet5_piece_4 - Plane(origin=(-75, 140, -10), x_dir=(0, -0.7071067811865475, -0.7071067811865475), z_dir=(-1, 0, 0)) * Sphere(FILLET5_R, mode=Mode.PRIVATE)
    add(fillet5_piece_4, mode=Mode.SUBTRACT)
    with BuildSketch(Plane(origin=(85, 150, -10), x_dir=(0, -1, 0), z_dir=(0, 0, -1))) as fillet5_piece_5:
        with BuildLine():
            CenterArc((FILLET5_R, FILLET5_R), FILLET5_R, 180, 90)
            Line((0, FILLET5_R), (0, 0))
            Line((0, 0), (FILLET5_R, 0))
        make_face()
    extrude(amount=80, mode=Mode.SUBTRACT)
    with BuildSketch(Plane(origin=(-85, 150, -10), x_dir=(0, -1, 0), z_dir=(0, 0, -1))) as fillet5_piece_6:
        with BuildLine():
            CenterArc((FILLET5_R, -FILLET5_R), FILLET5_R, 90, 90)
            Line((0, -FILLET5_R), (0, 0))
            Line((0, 0), (FILLET5_R, 0))
        make_face()
    extrude(amount=80, mode=Mode.SUBTRACT)

    # Sketch14 → Cut-Extrude9 (cut, through all)
    with BuildSketch(Plane(origin=(24.8, 0, 0), x_dir=(0, 0, -1), z_dir=(1, 0, 0))):
        with Locations(Location((50, 201, 0), (0, 0, 25.856016698))):
            Circle(SKETCH14_R)
    extrude(amount=-CUT_EXTRUDE9_DEPTH, mode=Mode.SUBTRACT)


with BuildPart() as body_2:
    # Sketch13 → Boss-Extrude7 (new body)
    with BuildSketch(Plane(origin=(0, 0, -100), x_dir=(-1, 0, 0), z_dir=(0, 0, -1))):
        Polygon((-25, -100), (-25, -130), (25.018802851, -130), (25, -100), align=None)
    extrude(amount=BOSS_EXTRUDE7_DEPTH)

    # Fillet4
    # the kernel refuses this fillet: 10 mm, written as the material it takes off along each edge
    with BuildSketch(Plane(origin=(-25.021013242, -133.526683302, -100.1), x_dir=(0, 0, 1), z_dir=(0.0006267615930631998, 0.9999998035849335, 0))) as fillet4_piece_1:
        with BuildLine():
            CenterArc((10, 1.410673598), FILLET4_R, 180, 8.109614456)
            Line((0, 1.410673598), (0, 0))
            Line((0, 0), (0.1, 0))
        make_face()
    extrude(amount=37.053373882, mode=Mode.SUBTRACT)
    with BuildSketch(Plane(origin=(25, -96.473316005, -100.1), x_dir=(0, 0, 1), z_dir=(0, -1, 0))) as fillet4_piece_2:
        with BuildLine():
            CenterArc((10, 1.410673598), FILLET4_R, 180, 8.109614456)
            Line((0, 1.410673598), (0, 0))
            Line((0, 0), (0.1, 0))
        make_face()
    extrude(amount=37.05336799, mode=Mode.SUBTRACT)
    with BuildSketch(Plane(origin=(28.526683995, -130, -100.1), x_dir=(0, 0, 1), z_dir=(-1, 0, 0))) as fillet4_piece_3:
        with BuildLine():
            CenterArc((10, 1.410673598), FILLET4_R, 180, 8.109614456)
            Line((0, 1.410673598), (0, 0))
            Line((0, 0), (0.1, 0))
        make_face()
    extrude(amount=57.072170841, mode=Mode.SUBTRACT)


solid = Compound([part.part, body_2.part])
